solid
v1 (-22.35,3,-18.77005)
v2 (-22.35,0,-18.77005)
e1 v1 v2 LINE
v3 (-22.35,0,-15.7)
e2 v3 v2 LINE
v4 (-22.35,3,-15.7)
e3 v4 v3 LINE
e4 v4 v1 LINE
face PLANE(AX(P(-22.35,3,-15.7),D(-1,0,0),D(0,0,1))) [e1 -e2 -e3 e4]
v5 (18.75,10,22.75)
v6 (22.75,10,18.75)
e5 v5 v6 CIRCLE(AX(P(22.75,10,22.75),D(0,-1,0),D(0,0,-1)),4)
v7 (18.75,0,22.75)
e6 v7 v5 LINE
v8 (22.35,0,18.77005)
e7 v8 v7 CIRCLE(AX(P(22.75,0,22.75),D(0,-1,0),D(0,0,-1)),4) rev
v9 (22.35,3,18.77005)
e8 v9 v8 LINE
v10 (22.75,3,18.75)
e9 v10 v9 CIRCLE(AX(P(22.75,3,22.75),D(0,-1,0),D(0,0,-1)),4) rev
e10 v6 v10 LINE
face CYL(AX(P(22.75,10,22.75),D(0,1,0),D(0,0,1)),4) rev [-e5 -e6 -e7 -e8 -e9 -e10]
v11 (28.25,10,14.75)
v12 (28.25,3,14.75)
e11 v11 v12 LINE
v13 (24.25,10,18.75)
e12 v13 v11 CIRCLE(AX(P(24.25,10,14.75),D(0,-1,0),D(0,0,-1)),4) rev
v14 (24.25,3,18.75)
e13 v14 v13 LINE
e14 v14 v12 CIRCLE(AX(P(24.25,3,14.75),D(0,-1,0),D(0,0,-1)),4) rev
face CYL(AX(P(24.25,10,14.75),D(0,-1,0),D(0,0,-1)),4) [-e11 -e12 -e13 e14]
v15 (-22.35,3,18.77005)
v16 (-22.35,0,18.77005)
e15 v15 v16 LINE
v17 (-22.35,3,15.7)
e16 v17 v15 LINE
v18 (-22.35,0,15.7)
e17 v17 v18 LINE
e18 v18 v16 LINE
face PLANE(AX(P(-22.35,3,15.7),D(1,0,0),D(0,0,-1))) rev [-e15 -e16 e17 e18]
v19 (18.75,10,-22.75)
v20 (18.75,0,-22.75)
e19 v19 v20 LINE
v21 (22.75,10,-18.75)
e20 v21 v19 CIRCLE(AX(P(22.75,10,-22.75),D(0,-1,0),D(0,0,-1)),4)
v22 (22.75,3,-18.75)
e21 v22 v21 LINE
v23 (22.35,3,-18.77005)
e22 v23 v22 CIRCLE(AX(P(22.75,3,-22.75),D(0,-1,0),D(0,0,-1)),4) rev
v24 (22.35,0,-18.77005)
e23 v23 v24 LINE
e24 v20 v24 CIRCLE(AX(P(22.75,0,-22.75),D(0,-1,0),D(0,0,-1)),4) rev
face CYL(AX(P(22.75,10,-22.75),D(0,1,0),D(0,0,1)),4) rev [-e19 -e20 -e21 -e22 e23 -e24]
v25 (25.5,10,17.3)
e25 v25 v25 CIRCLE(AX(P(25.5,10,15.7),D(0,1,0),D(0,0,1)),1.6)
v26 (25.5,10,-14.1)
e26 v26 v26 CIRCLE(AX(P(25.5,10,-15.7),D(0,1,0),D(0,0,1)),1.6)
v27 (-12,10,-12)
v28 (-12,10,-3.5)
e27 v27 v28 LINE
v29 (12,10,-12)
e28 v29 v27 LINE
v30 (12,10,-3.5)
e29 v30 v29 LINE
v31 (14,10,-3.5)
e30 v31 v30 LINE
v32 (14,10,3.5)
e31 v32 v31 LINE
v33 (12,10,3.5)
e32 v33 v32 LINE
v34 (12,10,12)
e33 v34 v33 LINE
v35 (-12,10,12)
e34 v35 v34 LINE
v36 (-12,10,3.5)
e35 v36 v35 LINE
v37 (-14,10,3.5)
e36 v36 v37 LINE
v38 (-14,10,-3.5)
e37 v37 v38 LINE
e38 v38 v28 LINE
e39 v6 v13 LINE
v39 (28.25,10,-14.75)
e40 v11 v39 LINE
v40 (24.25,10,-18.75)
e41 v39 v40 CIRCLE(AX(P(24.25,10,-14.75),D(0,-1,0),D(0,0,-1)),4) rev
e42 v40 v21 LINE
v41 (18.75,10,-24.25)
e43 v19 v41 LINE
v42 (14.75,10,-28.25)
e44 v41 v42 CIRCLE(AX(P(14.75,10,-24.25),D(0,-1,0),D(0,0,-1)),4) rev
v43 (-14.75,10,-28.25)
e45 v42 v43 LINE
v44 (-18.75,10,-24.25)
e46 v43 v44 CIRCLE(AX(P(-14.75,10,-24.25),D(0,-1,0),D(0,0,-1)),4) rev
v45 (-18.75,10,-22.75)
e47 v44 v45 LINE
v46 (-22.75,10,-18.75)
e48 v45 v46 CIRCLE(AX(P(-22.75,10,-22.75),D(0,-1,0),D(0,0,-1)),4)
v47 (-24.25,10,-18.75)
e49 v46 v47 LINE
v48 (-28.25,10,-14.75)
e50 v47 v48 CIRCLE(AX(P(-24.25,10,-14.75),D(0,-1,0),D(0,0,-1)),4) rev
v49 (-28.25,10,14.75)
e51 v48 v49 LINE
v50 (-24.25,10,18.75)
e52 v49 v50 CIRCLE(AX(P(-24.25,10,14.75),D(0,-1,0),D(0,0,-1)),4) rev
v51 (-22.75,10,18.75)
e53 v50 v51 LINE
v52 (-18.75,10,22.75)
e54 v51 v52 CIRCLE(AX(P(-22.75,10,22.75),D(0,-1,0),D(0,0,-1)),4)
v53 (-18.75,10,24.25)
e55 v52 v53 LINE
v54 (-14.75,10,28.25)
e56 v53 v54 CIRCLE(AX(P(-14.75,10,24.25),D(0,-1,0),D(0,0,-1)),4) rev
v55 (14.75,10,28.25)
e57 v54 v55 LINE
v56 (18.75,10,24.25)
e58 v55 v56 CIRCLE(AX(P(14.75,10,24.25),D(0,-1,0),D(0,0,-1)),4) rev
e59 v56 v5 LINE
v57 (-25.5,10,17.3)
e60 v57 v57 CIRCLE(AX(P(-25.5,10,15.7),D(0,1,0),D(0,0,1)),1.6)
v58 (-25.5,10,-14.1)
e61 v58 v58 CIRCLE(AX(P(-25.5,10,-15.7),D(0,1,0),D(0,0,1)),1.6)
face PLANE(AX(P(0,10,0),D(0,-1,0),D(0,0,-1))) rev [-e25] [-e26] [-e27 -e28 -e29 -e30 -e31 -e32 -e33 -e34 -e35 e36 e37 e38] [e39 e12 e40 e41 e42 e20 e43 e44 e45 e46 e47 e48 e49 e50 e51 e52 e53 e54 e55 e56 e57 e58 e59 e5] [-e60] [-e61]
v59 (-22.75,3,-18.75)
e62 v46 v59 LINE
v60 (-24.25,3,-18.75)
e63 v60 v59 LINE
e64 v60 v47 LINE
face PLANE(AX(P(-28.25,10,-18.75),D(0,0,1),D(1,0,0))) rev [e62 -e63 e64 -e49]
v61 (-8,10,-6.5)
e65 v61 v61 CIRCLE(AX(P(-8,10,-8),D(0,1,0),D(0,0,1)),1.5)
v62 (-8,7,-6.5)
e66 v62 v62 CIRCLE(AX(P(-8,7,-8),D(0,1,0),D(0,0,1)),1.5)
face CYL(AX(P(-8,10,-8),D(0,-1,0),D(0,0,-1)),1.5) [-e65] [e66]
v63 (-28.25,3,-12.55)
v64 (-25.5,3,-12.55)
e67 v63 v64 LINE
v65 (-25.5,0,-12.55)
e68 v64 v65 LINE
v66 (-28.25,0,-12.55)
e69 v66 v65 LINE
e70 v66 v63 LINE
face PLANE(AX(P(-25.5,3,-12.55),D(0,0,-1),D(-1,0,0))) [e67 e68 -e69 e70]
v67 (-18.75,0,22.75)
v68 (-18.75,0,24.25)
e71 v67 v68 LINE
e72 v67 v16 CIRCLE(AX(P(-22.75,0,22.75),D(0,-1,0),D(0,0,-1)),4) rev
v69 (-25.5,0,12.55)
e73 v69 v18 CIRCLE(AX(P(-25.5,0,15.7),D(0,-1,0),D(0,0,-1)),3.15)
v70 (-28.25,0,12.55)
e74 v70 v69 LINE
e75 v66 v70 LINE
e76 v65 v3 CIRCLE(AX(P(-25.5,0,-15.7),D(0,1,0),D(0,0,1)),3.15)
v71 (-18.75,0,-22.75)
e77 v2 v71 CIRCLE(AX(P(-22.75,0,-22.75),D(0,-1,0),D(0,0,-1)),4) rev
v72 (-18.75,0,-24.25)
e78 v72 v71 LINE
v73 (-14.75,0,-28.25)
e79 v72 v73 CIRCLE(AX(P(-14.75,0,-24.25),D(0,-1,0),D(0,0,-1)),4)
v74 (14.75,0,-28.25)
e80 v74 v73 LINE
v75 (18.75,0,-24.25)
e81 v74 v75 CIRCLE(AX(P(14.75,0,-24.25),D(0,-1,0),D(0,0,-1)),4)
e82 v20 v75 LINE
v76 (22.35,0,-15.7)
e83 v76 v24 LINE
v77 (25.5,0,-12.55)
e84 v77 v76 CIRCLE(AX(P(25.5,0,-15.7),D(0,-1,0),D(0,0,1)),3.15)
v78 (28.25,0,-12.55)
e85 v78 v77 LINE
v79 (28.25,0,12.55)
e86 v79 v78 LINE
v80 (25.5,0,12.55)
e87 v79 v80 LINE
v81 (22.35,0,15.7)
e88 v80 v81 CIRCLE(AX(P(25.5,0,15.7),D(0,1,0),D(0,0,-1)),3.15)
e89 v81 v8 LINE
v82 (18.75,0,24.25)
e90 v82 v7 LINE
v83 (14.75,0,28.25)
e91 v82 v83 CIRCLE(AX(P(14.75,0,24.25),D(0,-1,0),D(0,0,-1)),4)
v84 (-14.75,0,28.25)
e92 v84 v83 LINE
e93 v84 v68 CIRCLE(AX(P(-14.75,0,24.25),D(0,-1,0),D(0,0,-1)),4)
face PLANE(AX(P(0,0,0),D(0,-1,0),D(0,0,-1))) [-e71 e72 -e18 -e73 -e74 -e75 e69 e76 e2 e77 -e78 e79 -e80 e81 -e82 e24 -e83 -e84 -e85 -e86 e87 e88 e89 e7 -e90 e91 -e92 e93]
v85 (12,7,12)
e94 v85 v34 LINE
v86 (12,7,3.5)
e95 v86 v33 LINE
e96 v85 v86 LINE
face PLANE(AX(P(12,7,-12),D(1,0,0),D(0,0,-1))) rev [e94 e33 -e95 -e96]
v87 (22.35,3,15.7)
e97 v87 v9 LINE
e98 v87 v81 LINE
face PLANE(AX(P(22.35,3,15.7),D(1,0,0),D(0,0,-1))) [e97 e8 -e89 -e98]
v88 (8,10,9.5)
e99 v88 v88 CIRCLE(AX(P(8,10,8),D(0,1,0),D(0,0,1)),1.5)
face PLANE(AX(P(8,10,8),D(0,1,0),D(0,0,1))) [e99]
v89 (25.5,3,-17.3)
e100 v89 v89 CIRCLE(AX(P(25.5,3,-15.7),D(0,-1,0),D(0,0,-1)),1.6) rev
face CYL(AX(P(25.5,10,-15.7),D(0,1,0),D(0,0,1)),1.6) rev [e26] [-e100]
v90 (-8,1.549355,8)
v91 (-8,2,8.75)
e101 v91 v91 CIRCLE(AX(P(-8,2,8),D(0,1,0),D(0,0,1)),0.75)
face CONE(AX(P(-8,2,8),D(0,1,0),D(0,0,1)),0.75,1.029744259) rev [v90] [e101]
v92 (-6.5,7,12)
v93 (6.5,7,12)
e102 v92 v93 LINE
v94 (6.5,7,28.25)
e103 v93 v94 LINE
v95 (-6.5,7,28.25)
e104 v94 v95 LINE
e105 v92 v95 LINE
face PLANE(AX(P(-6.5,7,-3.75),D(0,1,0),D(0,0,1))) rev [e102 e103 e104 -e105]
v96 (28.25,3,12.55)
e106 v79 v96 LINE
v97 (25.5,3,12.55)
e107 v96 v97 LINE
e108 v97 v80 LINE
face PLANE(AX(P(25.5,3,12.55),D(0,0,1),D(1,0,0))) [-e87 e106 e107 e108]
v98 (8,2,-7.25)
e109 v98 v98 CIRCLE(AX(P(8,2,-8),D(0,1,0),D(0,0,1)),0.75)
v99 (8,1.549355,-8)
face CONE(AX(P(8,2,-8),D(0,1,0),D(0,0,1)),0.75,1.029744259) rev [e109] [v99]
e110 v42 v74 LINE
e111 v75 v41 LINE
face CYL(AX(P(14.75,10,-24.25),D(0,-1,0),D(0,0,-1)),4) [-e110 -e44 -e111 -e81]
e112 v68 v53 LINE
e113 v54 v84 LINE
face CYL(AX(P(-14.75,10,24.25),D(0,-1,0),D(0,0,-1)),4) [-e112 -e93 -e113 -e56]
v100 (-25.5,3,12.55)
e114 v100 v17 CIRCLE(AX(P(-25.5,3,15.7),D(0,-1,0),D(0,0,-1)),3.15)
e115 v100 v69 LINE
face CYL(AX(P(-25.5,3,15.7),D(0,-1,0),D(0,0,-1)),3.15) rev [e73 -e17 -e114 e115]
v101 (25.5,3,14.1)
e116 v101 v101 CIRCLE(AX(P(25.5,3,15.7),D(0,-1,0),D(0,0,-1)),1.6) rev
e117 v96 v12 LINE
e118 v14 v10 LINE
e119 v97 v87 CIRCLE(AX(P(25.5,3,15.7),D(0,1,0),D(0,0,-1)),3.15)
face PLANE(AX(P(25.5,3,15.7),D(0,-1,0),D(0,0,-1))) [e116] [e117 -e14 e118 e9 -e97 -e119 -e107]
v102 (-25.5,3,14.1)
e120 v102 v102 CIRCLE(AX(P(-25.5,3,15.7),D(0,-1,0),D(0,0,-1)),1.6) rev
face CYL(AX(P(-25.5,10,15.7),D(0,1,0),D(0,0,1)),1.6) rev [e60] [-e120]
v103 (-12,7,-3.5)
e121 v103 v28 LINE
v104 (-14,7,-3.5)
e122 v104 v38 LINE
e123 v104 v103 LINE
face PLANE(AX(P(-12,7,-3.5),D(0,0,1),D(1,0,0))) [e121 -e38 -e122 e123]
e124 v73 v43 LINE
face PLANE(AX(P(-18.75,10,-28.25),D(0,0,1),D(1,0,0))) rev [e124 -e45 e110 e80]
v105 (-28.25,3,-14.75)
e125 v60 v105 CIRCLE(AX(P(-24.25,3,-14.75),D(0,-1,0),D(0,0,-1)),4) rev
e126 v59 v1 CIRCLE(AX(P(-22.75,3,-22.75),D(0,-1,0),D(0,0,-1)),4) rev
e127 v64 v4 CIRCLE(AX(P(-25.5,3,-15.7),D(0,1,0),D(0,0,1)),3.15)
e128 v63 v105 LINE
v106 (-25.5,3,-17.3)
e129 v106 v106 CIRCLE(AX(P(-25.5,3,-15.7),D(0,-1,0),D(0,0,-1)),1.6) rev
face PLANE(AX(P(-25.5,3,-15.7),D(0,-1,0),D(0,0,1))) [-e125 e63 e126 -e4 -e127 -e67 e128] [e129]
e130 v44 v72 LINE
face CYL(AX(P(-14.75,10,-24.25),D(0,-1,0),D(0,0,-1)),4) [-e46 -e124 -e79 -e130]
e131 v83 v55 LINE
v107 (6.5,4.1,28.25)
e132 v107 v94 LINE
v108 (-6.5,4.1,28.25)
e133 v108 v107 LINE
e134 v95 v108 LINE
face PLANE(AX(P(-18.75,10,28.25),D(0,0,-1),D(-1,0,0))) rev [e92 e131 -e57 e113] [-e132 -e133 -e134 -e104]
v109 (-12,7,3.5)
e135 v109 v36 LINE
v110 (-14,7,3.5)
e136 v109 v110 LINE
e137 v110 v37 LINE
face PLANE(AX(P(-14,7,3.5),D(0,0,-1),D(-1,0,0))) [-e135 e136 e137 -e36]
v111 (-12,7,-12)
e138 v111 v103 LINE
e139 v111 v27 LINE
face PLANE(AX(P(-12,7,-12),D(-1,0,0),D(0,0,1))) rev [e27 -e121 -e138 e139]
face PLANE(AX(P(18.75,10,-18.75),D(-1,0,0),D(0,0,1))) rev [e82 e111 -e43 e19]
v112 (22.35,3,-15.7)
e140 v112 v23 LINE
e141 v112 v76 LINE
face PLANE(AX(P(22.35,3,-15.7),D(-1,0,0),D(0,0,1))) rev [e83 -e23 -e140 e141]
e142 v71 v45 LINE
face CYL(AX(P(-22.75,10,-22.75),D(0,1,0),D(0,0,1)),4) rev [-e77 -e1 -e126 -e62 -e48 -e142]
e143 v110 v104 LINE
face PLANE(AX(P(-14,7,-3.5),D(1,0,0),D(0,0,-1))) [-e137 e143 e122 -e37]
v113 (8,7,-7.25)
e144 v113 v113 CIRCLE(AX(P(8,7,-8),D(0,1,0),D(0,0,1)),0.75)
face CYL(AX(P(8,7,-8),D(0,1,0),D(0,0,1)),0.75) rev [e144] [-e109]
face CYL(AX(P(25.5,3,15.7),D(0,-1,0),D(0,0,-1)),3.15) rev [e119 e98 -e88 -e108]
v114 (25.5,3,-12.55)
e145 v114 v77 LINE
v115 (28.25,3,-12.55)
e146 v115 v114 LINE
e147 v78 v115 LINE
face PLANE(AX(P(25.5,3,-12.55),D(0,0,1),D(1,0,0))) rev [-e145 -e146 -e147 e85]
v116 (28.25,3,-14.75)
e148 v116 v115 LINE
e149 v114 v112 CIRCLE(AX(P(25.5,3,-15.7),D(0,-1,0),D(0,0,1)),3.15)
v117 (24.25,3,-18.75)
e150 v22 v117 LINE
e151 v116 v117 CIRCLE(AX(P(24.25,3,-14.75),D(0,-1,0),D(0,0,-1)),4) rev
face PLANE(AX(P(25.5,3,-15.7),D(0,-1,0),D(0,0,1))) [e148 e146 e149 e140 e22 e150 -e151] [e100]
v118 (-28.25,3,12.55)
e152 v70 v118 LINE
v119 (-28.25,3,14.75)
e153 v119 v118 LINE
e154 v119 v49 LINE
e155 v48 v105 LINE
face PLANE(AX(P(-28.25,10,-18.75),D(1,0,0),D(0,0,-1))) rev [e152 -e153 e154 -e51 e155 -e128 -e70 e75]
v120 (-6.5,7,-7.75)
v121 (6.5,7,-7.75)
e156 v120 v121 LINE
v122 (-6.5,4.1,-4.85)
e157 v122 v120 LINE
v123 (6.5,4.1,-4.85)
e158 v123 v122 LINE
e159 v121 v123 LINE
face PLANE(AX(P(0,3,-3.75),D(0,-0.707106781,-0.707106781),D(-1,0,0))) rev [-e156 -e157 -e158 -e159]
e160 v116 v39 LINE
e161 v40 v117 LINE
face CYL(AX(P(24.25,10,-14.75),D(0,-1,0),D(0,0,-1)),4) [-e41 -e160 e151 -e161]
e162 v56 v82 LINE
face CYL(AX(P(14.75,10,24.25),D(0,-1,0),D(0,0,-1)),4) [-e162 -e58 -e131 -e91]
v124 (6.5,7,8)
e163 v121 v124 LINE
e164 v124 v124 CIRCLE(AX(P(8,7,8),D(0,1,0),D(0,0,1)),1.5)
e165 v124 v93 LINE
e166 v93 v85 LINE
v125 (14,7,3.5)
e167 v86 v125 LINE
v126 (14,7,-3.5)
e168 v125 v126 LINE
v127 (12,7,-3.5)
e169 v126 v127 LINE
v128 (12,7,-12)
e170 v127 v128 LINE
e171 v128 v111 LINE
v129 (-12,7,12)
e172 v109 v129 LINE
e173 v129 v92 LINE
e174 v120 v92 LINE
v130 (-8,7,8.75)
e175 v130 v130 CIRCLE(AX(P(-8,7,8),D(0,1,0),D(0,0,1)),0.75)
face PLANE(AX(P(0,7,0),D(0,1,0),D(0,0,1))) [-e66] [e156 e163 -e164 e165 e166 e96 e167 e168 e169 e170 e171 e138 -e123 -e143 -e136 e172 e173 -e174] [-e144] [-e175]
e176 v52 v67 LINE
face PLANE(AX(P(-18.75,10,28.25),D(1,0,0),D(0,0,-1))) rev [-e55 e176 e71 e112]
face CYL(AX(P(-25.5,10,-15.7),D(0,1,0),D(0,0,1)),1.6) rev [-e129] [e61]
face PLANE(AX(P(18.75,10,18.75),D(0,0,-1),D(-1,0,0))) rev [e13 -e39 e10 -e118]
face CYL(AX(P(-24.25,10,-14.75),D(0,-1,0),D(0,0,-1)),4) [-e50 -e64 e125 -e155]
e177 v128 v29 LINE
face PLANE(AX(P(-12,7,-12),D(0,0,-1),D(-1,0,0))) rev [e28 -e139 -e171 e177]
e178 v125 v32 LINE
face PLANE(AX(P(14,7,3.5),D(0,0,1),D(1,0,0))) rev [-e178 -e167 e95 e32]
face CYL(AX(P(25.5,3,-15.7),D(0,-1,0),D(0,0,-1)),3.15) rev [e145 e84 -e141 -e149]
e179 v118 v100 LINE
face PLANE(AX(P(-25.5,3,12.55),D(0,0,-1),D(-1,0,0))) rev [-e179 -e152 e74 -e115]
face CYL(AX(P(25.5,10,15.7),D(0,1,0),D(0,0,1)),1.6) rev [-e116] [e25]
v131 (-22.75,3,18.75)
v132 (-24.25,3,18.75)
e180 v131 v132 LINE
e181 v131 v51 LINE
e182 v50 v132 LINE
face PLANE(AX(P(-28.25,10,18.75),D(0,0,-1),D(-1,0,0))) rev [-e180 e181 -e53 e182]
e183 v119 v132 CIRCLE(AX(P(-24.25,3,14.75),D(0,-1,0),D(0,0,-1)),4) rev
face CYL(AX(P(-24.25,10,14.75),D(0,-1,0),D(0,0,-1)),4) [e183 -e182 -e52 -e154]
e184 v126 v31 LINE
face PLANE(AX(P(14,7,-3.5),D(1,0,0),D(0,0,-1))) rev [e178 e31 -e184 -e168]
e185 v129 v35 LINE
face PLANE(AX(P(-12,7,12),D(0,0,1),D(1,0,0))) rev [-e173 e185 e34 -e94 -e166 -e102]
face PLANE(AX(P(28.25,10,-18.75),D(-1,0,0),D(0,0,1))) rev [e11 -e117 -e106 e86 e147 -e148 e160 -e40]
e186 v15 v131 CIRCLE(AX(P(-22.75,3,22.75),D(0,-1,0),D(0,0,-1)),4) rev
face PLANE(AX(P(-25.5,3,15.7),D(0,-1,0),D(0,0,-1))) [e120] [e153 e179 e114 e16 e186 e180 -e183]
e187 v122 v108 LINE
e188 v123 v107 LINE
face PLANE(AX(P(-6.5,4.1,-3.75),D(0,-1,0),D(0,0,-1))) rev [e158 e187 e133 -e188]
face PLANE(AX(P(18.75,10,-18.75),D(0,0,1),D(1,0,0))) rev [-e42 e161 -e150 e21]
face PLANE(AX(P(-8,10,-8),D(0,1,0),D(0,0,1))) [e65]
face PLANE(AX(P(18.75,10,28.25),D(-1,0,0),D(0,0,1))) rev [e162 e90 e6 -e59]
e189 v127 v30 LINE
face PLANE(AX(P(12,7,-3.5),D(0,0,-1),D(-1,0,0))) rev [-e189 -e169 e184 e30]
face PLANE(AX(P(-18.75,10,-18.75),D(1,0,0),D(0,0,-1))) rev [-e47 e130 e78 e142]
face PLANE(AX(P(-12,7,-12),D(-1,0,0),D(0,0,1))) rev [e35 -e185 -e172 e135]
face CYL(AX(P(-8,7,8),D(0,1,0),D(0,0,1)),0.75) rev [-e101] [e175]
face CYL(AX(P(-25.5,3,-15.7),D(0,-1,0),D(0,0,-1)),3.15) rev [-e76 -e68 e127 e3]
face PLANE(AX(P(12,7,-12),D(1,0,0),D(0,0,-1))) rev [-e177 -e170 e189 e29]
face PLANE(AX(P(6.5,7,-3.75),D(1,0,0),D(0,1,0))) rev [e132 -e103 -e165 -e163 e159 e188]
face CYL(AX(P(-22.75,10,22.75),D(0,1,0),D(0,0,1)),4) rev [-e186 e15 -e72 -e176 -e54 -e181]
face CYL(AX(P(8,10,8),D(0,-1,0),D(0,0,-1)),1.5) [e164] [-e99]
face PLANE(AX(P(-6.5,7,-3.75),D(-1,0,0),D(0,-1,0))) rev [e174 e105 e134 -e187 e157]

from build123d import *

# Parameters (mm, degrees)
AUFSATZ_LINEAR_AUSTRAGEN1_DEPTH      = 10
SKIZZE2_W                            = 24
SKIZZE2_H                            = 24
SCHNITT_LINEAR_AUSTRAGEN1_DEPTH      = 3
VERRUNDUNG1_R                        = 4
SKIZZE3_R                            = 1.5
AUFSATZ_LINEAR_AUSTRAGEN2_DEPTH      = 3
SKIZZE4_W                            = 2
SKIZZE4_H                            = 7
SCHNITT_LINEAR_AUSTRAGEN2_DEPTH      = 3
SKIZZE5_W                            = 13
SKIZZE5_H                            = 2.9
SCHNITT_LINEAR_AUSTRAGEN3_DEPTH      = 32
FASE1_SIZE                           = 4
F_3_2_3_2_DURCHMESSER_BOHRUNG1_D     = 3.2
F_3_2_3_2_DURCHMESSER_BOHRUNG1_DEPTH = 11
F_3_2_3_2_DURCHMESSER_BOHRUNG1_TIP   = 0.96137699
F_1_5_1_5_DURCHMESSER_BOHRUNG1_D     = 1.5
F_1_5_1_5_DURCHMESSER_BOHRUNG1_DEPTH = 5
F_1_5_1_5_DURCHMESSER_BOHRUNG1_TIP   = 0.450645464
SCHNITT_LINEAR_AUSTRAGEN4_DEPTH      = 3
SPIEGELN3_COPY_1_DEPTH               = 3


with BuildPart() as part:
    # Skizze1 → Aufsatz-Linear austragen1 (new body)
    with BuildSketch(Plane(origin=(0, 0, 0), x_dir=(1, 0, 0), z_dir=(0, 1, 0))):
        Polygon((18.75, 18.75), (28.25, 18.75), (28.25, -18.75), (18.75, -18.75), (18.75, -28.25), (-18.75, -28.25), (-18.75, -18.75), (-28.25, -18.75), (-28.25, 18.75), (-18.75, 18.75), (-18.75, 28.25), (18.75, 28.25), align=None)
    extrude(amount=AUFSATZ_LINEAR_AUSTRAGEN1_DEPTH)

    # Skizze2 → Schnitt-Linear austragen1 (cut)
    with BuildSketch(Plane(origin=(0, 10, 0), x_dir=(1, 0, 0), z_dir=(0, 1, 0))):
        Rectangle(SKIZZE2_W, SKIZZE2_H)
    extrude(amount=-SCHNITT_LINEAR_AUSTRAGEN1_DEPTH, mode=Mode.SUBTRACT)

    # Verrundung1
    verrundung1_edges = [part.edges().sort_by_distance(p)[0] for p in [
        (18.75, 5, 18.75),
        (18.75, 5, 28.25),
        (-18.75, 5, 28.25),
        (-18.75, 5, 18.75),
        (-28.25, 5, 18.75),
        (-28.25, 5, -18.75),
        (-18.75, 5, -18.75),
        (-18.75, 5, -28.25),
        (18.75, 5, -28.25),
        (18.75, 5, -18.75),
        (28.25, 5, -18.75),
        (28.25, 5, 18.75),
    ]]
    fillet(verrundung1_edges, radius=VERRUNDUNG1_R)

    # Skizze3 → Aufsatz-Linear austragen2 (add)
    with BuildSketch(Plane(origin=(0, 7, 0), x_dir=(1, 0, 0), z_dir=(0, 1, 0))):
        with Locations(Location((-8, 8, 0), (0, 0, 270))):
            Circle(SKIZZE3_R)
        with Locations(Location((8, -8, 0), (0, 0, 270))):
            Circle(SKIZZE3_R)
    extrude(amount=AUFSATZ_LINEAR_AUSTRAGEN2_DEPTH)

    # Skizze4 → Schnitt-Linear austragen2 (cut)
    with BuildSketch(Plane(origin=(0, 10, 0), x_dir=(1, 0, 0), z_dir=(0, 1, 0))):
        with Locations((13, 0)):
            Rectangle(SKIZZE4_W, SKIZZE4_H)
    schnitt_linear_austragen2 = extrude(amount=-SCHNITT_LINEAR_AUSTRAGEN2_DEPTH, mode=Mode.SUBTRACT)

    # Spiegeln1: Schnitt-Linear austragen2 across plane
    add(schnitt_linear_austragen2.mirror(Plane(origin=(0, 0, 0), x_dir=(0, 0, 1), z_dir=(1, 0, 0))), mode=Mode.SUBTRACT)

    # Skizze5 → Schnitt-Linear austragen3 (cut)
    with BuildSketch(Plane.XY.offset(28.25)):
        with Locations((0, 5.55)):
            Rectangle(SKIZZE5_W, SKIZZE5_H)
    extrude(amount=-SCHNITT_LINEAR_AUSTRAGEN3_DEPTH, mode=Mode.SUBTRACT)

    # Fase1
    # the kernel refuses this chamfer: 4 mm, written as the material it takes off along each edge
    with BuildSketch(Plane(origin=(-6.5, 7, -3.75), x_dir=(0, 0.027495876610586494, -0.9996219169112968), z_dir=(1, 0, 0))) as fase1_piece_1_section:
        Polygon((FASE1_SIZE * 0.999621916911, -FASE1_SIZE * 0.0274958766106), (-FASE1_SIZE * 0.0274958766106, -FASE1_SIZE * 0.999621916911), (0, 0), align=None)
    fase1_piece_1 = extrude(amount=13, mode=Mode.PRIVATE)
    fase1_piece_1 = split(fase1_piece_1, bisect_by=Plane(origin=(0, 4.1, -5.171489132), z_dir=(0, 1, 0)), keep=Keep.TOP, mode=Mode.PRIVATE)
    add(fase1_piece_1, mode=Mode.SUBTRACT)

    # Ø3.2 (3.2) Durchmesser Bohrung1
    with Locations(Plane(origin=(0, 10, 0), x_dir=(1, 0, 0), z_dir=(0, 1, 0))):
        with Locations((-25.5, -15.7), (25.5, 15.7), (25.5, -15.7), (-25.5, 15.7)):
            Hole(F_3_2_3_2_DURCHMESSER_BOHRUNG1_D / 2, depth=F_3_2_3_2_DURCHMESSER_BOHRUNG1_DEPTH)
            with Locations((0, 0, -(F_3_2_3_2_DURCHMESSER_BOHRUNG1_DEPTH + F_3_2_3_2_DURCHMESSER_BOHRUNG1_TIP / 2))):  # 118° drill point
                Cone(0, F_3_2_3_2_DURCHMESSER_BOHRUNG1_D / 2, F_3_2_3_2_DURCHMESSER_BOHRUNG1_TIP, mode=Mode.SUBTRACT)

    # Ø1.5 (1.5) Durchmesser Bohrung1
    with Locations(Plane(origin=(0, 7, 0), x_dir=(1, 0, 0), z_dir=(0, 1, 0))):
        with Locations((8, 8), (-8, -8)):
            Hole(F_1_5_1_5_DURCHMESSER_BOHRUNG1_D / 2, depth=F_1_5_1_5_DURCHMESSER_BOHRUNG1_DEPTH)
            with Locations((0, 0, -(F_1_5_1_5_DURCHMESSER_BOHRUNG1_DEPTH + F_1_5_1_5_DURCHMESSER_BOHRUNG1_TIP / 2))):  # 118° drill point
                Cone(0, F_1_5_1_5_DURCHMESSER_BOHRUNG1_D / 2, F_1_5_1_5_DURCHMESSER_BOHRUNG1_TIP, mode=Mode.SUBTRACT)

    # Skizze12 → Schnitt-Linear austragen4 (cut)
    with BuildSketch(Plane.XZ):
        with BuildLine():
            Line((-22.35, 15.7), (-22.35, 18.85))
            Line((-22.35, 18.85), (-25.5, 18.85))
            ThreePointArc((-25.5, 18.85), (-27.727386361, 17.927386361), (-28.65, 15.7))
            Line((-28.65, 15.7), (-28.65, 12.55))
            Line((-28.65, 12.55), (-25.5, 12.55))
            ThreePointArc((-25.5, 12.55), (-23.272613639, 13.472613639), (-22.35, 15.7))
        make_face()
    schnitt_linear_austragen4 = extrude(amount=-SCHNITT_LINEAR_AUSTRAGEN4_DEPTH, mode=Mode.SUBTRACT)

    # Spiegeln2: Schnitt-Linear austragen4 across plane
    add(schnitt_linear_austragen4.mirror(Plane(origin=(0, 0, 0), x_dir=(0, 0, 1), z_dir=(1, 0, 0))), mode=Mode.SUBTRACT)

    # Spiegeln3: Schnitt-Linear austragen4 across plane
    add(schnitt_linear_austragen4.mirror(Plane.XY), mode=Mode.SUBTRACT)

    # Spiegeln3 copy 1 sketch → Spiegeln3 copy 1 (cut)
    with BuildSketch(Plane(origin=(0, 0, 0), x_dir=(-1, 0, 0), z_dir=(0, -1, 0))):
        with BuildLine():
            Line((-22.35, 15.7), (-22.35, 18.85))
            Line((-22.35, 18.85), (-25.5, 18.85))
            ThreePointArc((-25.5, 18.85), (-27.727386361, 17.927386361), (-28.65, 15.7))
            Line((-28.65, 15.7), (-28.65, 12.55))
            Line((-28.65, 12.55), (-25.5, 12.55))
            ThreePointArc((-25.5, 12.55), (-23.272613639, 13.472613639), (-22.35, 15.7))
        make_face()
    extrude(amount=-SPIEGELN3_COPY_1_DEPTH, mode=Mode.SUBTRACT)


solid = part.part
